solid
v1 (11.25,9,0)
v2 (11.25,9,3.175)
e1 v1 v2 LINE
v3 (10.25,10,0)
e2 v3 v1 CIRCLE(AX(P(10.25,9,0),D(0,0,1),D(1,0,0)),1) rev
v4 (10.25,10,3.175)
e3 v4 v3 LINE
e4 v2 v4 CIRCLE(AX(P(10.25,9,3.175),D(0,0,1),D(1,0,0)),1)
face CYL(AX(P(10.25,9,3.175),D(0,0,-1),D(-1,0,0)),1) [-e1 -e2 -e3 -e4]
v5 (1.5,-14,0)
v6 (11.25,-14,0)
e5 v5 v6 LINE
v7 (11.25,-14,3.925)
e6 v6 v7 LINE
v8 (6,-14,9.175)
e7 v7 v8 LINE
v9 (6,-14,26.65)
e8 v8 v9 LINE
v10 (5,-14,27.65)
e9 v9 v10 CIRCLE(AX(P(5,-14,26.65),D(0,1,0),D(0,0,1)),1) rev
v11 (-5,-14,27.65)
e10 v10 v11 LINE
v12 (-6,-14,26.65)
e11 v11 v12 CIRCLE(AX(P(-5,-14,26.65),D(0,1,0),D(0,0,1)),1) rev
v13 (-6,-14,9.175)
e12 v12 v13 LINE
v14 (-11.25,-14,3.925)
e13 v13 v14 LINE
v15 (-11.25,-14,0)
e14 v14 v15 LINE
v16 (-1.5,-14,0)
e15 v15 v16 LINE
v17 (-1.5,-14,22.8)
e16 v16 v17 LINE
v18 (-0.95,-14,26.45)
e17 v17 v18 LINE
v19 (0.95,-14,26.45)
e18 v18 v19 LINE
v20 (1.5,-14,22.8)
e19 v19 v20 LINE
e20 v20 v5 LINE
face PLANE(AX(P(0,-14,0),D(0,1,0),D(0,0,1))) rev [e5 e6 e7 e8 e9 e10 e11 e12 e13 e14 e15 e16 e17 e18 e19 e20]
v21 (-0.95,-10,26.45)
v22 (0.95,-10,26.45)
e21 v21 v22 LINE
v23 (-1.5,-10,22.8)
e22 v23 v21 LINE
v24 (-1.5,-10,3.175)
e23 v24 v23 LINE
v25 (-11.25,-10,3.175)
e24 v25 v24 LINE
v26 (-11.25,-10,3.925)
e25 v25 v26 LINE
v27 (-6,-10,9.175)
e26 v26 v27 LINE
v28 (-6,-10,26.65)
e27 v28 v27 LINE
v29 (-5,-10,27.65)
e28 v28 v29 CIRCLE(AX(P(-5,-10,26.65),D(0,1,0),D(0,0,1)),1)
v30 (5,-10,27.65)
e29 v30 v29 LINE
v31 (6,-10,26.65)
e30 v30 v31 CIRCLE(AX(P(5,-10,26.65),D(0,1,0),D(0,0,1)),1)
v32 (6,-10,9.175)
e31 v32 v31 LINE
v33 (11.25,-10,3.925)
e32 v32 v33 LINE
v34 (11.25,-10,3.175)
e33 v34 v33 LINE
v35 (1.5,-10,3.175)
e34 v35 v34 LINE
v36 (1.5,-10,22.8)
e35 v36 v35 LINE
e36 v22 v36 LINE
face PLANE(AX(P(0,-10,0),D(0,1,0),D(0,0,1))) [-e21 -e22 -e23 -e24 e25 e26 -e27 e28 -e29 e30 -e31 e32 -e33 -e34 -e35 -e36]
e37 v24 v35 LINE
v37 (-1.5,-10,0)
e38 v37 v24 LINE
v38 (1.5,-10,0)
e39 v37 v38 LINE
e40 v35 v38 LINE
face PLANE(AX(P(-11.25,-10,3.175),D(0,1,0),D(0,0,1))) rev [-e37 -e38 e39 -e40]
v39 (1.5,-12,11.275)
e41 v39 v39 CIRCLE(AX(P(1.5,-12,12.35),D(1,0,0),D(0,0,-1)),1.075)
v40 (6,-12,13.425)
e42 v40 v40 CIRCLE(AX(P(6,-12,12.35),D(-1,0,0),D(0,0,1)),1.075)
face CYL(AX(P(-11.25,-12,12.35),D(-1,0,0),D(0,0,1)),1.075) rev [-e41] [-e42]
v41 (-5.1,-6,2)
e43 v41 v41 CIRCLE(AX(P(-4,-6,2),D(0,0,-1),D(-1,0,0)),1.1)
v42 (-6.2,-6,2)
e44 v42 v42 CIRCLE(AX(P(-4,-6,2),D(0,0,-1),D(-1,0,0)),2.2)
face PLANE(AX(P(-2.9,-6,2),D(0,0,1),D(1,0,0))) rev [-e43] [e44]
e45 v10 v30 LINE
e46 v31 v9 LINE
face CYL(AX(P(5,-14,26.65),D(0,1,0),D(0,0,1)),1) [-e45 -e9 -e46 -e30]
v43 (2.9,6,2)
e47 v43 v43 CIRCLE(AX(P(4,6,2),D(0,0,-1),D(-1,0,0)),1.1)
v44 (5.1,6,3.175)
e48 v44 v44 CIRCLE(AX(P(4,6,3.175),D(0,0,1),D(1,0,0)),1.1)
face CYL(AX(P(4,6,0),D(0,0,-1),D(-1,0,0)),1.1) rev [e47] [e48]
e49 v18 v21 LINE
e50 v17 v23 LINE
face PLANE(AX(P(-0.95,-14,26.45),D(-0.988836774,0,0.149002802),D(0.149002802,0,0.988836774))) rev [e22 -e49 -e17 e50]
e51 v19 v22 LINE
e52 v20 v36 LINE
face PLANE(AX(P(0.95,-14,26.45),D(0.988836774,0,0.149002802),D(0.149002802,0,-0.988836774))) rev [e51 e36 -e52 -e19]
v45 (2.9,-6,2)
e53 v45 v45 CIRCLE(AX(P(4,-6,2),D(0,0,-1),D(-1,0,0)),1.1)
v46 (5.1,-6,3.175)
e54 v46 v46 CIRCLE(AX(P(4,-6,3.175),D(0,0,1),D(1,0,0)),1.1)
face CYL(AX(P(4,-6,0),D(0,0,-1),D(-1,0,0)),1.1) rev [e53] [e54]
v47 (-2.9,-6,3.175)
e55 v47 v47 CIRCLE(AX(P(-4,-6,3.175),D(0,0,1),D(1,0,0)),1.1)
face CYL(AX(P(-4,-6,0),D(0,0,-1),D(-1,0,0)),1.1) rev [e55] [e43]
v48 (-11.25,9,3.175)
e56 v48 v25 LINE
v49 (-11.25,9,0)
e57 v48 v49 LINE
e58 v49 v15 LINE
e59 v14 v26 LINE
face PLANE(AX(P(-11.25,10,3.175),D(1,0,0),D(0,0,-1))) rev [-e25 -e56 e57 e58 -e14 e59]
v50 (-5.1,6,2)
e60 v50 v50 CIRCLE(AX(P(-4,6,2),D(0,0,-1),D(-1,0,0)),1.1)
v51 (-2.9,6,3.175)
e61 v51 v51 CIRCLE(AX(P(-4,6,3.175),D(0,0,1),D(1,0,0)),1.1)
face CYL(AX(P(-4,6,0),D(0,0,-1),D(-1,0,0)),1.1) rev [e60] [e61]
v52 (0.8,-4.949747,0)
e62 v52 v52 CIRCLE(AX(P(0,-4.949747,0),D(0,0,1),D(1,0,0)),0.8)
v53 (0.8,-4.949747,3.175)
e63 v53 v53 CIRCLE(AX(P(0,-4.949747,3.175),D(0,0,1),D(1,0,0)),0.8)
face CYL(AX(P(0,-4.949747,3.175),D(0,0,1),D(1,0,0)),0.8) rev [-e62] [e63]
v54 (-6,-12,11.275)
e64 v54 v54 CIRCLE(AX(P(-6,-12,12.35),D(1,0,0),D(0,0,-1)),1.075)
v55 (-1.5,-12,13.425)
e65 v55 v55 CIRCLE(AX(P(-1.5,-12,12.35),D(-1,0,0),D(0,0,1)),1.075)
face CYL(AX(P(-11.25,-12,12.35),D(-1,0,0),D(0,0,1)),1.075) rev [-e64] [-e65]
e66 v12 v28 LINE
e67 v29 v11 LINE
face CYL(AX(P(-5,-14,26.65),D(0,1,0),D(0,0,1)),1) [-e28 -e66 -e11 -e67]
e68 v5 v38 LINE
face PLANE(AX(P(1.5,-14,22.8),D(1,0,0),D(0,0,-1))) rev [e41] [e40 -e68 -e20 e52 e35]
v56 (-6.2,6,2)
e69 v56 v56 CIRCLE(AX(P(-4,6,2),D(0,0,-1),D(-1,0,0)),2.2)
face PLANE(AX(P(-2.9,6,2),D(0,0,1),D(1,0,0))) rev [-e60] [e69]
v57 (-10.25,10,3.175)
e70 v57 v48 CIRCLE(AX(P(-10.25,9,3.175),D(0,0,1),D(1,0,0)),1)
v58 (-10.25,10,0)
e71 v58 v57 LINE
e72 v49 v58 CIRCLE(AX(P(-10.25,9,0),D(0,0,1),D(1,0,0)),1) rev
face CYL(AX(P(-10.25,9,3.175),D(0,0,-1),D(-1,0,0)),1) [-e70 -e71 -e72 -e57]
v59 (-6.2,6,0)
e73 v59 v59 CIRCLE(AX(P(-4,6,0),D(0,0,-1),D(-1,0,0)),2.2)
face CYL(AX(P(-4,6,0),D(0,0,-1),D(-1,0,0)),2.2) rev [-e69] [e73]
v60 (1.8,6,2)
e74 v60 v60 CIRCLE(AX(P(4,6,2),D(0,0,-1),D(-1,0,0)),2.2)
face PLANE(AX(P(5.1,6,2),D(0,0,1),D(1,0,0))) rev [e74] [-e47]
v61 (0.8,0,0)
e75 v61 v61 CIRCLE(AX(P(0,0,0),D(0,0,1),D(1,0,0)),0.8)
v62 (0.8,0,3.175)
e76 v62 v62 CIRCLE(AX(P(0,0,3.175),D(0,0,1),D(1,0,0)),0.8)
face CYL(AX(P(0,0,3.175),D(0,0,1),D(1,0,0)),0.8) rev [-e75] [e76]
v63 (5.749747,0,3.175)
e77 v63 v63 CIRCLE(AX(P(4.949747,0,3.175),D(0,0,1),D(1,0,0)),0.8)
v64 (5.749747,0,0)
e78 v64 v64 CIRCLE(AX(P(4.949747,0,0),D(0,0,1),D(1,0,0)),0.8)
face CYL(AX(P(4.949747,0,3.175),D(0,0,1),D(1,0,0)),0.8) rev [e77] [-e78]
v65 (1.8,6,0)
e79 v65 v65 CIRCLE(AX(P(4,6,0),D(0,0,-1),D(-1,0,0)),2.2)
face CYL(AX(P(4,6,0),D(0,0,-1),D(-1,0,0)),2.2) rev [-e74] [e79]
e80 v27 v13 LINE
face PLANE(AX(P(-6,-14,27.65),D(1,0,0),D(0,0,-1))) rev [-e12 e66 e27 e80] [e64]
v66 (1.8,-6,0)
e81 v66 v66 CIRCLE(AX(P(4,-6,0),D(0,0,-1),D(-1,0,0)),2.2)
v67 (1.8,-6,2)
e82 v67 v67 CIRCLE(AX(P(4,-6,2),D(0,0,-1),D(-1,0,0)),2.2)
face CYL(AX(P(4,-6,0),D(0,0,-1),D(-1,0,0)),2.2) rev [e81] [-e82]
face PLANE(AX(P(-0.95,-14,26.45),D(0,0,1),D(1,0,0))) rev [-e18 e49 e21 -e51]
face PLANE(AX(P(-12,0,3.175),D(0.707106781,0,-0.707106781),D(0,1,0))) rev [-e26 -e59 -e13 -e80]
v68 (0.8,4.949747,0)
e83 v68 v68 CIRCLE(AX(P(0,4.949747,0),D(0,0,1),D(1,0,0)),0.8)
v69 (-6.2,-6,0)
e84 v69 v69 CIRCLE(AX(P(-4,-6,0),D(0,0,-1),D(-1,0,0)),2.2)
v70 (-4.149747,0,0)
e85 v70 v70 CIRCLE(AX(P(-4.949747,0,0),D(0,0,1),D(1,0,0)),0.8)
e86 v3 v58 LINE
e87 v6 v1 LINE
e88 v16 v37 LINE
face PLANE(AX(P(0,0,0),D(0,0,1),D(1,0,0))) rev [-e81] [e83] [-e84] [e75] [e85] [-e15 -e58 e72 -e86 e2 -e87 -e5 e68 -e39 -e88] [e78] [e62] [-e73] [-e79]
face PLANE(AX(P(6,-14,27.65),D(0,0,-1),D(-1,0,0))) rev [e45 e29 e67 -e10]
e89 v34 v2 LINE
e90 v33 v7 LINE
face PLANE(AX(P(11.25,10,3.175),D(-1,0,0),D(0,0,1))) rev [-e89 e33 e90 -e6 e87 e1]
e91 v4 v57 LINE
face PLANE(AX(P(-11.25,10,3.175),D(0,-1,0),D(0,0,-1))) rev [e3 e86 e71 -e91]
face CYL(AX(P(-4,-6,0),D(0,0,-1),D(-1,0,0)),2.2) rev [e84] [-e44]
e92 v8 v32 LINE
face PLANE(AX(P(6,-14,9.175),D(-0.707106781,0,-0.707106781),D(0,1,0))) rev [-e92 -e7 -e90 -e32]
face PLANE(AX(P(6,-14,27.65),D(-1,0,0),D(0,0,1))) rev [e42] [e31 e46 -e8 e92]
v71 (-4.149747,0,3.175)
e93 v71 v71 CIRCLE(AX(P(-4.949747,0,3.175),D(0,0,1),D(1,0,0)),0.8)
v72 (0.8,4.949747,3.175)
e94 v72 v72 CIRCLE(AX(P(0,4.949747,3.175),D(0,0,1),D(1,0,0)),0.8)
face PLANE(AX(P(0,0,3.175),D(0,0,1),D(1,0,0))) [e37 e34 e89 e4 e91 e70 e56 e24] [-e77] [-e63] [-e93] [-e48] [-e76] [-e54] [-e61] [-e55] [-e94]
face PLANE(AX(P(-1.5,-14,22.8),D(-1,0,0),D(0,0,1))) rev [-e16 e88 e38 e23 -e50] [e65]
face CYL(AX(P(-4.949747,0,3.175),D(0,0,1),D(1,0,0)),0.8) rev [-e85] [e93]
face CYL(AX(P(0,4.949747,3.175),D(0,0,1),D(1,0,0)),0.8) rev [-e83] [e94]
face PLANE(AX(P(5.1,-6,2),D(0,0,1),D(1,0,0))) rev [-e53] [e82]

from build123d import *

# Parameters (mm, degrees)
SKETCH1_W                      = 22.5
SKETCH1_H                      = 20
BOSS_EXTRUDE1_DEPTH            = 3.175
TAP_DRILL_FOR_M2X0_4_TAP2_D    = 1.6
BOSS_EXTRUDE2_DEPTH            = 4
CHAMFER1_SIZE                  = 6
M2_CLEARANCE_HOLE1_D           = 2.15
FILLET1_R                      = 1
CBORE_FOR_M2_SHCS1_D           = 2.2
CBORE_FOR_M2_SHCS1_CBORE_D     = 4.4
CBORE_FOR_M2_SHCS1_CBORE_DEPTH = 2


with BuildPart() as part:
    # Sketch1 → Boss-Extrude1 (new body)
    with BuildSketch(Plane.XY):
        Rectangle(SKETCH1_W, SKETCH1_H)
    extrude(amount=BOSS_EXTRUDE1_DEPTH)

    # Tap Drill for M2x0.4 Tap2 (through all)
    with Locations(Plane.XY.offset(3.175)):
        with Locations((0, 0), (-4.949747468, 0), (0, -4.949747468), (4.949747468, 0), (0, 4.949747468)):
            Hole(TAP_DRILL_FOR_M2X0_4_TAP2_D / 2)

    # Sketch10 → Boss-Extrude2 (add)
    with BuildSketch(Plane.XZ.offset(10)):
        Polygon((6, 27.65), (-6, 27.65), (-6, 3.175), (-11.25, 3.175), (-11.25, 0), (-1.5, 0), (-1.5, 22.8), (-0.95, 26.45), (0.95, 26.45), (1.5, 22.8), (1.5, 0), (11.25, 0), (11.25, 3.175), (6, 3.175), align=None)
    extrude(amount=BOSS_EXTRUDE2_DEPTH)

    # Chamfer1
    # the kernel refuses this chamfer: 6 mm, written as the material it adds along each edge
    with BuildSketch(Plane(origin=(-6, -10, 3.175), x_dir=(-0.9996219169112969, 0, -0.02749587661058649), z_dir=(0, -1, 0))) as chamfer1_piece_1_section:
        Polygon((CHAMFER1_SIZE * 0.999621916911, -CHAMFER1_SIZE * 0.0274958766106), (-CHAMFER1_SIZE * 0.0274958766106, -CHAMFER1_SIZE * 0.999621916911), (0, 0), align=None)
    chamfer1_piece_1 = extrude(amount=4, mode=Mode.PRIVATE)
    chamfer1_piece_1 = split(chamfer1_piece_1, bisect_by=Plane(origin=(-11.25, -12, 5.202939), z_dir=(1, 0, 0)), keep=Keep.TOP, mode=Mode.PRIVATE)
    add(chamfer1_piece_1)
    with BuildSketch(Plane(origin=(6, -10, 3.175), x_dir=(0.9996219169112969, 0, -0.02749587661058649), z_dir=(0, -1, 0))) as chamfer1_piece_2_section:
        Polygon((CHAMFER1_SIZE * 0.999621916911, CHAMFER1_SIZE * 0.0274958766106), (-CHAMFER1_SIZE * 0.0274958766106, CHAMFER1_SIZE * 0.999621916911), (0, 0), align=None)
    chamfer1_piece_2 = extrude(amount=4, mode=Mode.PRIVATE)
    chamfer1_piece_2 = split(chamfer1_piece_2, bisect_by=Plane(origin=(11.25, -12, 5.202939), z_dir=(-1, 0, 0)), keep=Keep.TOP, mode=Mode.PRIVATE)
    add(chamfer1_piece_2)

    # M2 Clearance Hole1 (through all)
    with Locations(Plane.ZY.offset(11.25)):
        with Locations((12.35, -12)):
            Hole(M2_CLEARANCE_HOLE1_D / 2)

    # Fillet1
    fillet1_edges = [part.edges().sort_by_distance(p)[0] for p in [
        (6, -12, 27.65),
        (-6, -12, 27.65),
        (-11.25, 10, 1.5875),
        (11.25, 10, 1.5875),
    ]]
    fillet(fillet1_edges, radius=FILLET1_R)

    # CBORE for M2 SHCS1 (through all)
    with Locations(Plane(origin=(0, 0, 0), x_dir=(-1, 0, 0), z_dir=(0, 0, -1))):
        with Locations((4, -6), (-4, 6), (-4, -6), (4, 6)):
            CounterBoreHole(CBORE_FOR_M2_SHCS1_D / 2, CBORE_FOR_M2_SHCS1_CBORE_D / 2, CBORE_FOR_M2_SHCS1_CBORE_DEPTH)


solid = part.part
